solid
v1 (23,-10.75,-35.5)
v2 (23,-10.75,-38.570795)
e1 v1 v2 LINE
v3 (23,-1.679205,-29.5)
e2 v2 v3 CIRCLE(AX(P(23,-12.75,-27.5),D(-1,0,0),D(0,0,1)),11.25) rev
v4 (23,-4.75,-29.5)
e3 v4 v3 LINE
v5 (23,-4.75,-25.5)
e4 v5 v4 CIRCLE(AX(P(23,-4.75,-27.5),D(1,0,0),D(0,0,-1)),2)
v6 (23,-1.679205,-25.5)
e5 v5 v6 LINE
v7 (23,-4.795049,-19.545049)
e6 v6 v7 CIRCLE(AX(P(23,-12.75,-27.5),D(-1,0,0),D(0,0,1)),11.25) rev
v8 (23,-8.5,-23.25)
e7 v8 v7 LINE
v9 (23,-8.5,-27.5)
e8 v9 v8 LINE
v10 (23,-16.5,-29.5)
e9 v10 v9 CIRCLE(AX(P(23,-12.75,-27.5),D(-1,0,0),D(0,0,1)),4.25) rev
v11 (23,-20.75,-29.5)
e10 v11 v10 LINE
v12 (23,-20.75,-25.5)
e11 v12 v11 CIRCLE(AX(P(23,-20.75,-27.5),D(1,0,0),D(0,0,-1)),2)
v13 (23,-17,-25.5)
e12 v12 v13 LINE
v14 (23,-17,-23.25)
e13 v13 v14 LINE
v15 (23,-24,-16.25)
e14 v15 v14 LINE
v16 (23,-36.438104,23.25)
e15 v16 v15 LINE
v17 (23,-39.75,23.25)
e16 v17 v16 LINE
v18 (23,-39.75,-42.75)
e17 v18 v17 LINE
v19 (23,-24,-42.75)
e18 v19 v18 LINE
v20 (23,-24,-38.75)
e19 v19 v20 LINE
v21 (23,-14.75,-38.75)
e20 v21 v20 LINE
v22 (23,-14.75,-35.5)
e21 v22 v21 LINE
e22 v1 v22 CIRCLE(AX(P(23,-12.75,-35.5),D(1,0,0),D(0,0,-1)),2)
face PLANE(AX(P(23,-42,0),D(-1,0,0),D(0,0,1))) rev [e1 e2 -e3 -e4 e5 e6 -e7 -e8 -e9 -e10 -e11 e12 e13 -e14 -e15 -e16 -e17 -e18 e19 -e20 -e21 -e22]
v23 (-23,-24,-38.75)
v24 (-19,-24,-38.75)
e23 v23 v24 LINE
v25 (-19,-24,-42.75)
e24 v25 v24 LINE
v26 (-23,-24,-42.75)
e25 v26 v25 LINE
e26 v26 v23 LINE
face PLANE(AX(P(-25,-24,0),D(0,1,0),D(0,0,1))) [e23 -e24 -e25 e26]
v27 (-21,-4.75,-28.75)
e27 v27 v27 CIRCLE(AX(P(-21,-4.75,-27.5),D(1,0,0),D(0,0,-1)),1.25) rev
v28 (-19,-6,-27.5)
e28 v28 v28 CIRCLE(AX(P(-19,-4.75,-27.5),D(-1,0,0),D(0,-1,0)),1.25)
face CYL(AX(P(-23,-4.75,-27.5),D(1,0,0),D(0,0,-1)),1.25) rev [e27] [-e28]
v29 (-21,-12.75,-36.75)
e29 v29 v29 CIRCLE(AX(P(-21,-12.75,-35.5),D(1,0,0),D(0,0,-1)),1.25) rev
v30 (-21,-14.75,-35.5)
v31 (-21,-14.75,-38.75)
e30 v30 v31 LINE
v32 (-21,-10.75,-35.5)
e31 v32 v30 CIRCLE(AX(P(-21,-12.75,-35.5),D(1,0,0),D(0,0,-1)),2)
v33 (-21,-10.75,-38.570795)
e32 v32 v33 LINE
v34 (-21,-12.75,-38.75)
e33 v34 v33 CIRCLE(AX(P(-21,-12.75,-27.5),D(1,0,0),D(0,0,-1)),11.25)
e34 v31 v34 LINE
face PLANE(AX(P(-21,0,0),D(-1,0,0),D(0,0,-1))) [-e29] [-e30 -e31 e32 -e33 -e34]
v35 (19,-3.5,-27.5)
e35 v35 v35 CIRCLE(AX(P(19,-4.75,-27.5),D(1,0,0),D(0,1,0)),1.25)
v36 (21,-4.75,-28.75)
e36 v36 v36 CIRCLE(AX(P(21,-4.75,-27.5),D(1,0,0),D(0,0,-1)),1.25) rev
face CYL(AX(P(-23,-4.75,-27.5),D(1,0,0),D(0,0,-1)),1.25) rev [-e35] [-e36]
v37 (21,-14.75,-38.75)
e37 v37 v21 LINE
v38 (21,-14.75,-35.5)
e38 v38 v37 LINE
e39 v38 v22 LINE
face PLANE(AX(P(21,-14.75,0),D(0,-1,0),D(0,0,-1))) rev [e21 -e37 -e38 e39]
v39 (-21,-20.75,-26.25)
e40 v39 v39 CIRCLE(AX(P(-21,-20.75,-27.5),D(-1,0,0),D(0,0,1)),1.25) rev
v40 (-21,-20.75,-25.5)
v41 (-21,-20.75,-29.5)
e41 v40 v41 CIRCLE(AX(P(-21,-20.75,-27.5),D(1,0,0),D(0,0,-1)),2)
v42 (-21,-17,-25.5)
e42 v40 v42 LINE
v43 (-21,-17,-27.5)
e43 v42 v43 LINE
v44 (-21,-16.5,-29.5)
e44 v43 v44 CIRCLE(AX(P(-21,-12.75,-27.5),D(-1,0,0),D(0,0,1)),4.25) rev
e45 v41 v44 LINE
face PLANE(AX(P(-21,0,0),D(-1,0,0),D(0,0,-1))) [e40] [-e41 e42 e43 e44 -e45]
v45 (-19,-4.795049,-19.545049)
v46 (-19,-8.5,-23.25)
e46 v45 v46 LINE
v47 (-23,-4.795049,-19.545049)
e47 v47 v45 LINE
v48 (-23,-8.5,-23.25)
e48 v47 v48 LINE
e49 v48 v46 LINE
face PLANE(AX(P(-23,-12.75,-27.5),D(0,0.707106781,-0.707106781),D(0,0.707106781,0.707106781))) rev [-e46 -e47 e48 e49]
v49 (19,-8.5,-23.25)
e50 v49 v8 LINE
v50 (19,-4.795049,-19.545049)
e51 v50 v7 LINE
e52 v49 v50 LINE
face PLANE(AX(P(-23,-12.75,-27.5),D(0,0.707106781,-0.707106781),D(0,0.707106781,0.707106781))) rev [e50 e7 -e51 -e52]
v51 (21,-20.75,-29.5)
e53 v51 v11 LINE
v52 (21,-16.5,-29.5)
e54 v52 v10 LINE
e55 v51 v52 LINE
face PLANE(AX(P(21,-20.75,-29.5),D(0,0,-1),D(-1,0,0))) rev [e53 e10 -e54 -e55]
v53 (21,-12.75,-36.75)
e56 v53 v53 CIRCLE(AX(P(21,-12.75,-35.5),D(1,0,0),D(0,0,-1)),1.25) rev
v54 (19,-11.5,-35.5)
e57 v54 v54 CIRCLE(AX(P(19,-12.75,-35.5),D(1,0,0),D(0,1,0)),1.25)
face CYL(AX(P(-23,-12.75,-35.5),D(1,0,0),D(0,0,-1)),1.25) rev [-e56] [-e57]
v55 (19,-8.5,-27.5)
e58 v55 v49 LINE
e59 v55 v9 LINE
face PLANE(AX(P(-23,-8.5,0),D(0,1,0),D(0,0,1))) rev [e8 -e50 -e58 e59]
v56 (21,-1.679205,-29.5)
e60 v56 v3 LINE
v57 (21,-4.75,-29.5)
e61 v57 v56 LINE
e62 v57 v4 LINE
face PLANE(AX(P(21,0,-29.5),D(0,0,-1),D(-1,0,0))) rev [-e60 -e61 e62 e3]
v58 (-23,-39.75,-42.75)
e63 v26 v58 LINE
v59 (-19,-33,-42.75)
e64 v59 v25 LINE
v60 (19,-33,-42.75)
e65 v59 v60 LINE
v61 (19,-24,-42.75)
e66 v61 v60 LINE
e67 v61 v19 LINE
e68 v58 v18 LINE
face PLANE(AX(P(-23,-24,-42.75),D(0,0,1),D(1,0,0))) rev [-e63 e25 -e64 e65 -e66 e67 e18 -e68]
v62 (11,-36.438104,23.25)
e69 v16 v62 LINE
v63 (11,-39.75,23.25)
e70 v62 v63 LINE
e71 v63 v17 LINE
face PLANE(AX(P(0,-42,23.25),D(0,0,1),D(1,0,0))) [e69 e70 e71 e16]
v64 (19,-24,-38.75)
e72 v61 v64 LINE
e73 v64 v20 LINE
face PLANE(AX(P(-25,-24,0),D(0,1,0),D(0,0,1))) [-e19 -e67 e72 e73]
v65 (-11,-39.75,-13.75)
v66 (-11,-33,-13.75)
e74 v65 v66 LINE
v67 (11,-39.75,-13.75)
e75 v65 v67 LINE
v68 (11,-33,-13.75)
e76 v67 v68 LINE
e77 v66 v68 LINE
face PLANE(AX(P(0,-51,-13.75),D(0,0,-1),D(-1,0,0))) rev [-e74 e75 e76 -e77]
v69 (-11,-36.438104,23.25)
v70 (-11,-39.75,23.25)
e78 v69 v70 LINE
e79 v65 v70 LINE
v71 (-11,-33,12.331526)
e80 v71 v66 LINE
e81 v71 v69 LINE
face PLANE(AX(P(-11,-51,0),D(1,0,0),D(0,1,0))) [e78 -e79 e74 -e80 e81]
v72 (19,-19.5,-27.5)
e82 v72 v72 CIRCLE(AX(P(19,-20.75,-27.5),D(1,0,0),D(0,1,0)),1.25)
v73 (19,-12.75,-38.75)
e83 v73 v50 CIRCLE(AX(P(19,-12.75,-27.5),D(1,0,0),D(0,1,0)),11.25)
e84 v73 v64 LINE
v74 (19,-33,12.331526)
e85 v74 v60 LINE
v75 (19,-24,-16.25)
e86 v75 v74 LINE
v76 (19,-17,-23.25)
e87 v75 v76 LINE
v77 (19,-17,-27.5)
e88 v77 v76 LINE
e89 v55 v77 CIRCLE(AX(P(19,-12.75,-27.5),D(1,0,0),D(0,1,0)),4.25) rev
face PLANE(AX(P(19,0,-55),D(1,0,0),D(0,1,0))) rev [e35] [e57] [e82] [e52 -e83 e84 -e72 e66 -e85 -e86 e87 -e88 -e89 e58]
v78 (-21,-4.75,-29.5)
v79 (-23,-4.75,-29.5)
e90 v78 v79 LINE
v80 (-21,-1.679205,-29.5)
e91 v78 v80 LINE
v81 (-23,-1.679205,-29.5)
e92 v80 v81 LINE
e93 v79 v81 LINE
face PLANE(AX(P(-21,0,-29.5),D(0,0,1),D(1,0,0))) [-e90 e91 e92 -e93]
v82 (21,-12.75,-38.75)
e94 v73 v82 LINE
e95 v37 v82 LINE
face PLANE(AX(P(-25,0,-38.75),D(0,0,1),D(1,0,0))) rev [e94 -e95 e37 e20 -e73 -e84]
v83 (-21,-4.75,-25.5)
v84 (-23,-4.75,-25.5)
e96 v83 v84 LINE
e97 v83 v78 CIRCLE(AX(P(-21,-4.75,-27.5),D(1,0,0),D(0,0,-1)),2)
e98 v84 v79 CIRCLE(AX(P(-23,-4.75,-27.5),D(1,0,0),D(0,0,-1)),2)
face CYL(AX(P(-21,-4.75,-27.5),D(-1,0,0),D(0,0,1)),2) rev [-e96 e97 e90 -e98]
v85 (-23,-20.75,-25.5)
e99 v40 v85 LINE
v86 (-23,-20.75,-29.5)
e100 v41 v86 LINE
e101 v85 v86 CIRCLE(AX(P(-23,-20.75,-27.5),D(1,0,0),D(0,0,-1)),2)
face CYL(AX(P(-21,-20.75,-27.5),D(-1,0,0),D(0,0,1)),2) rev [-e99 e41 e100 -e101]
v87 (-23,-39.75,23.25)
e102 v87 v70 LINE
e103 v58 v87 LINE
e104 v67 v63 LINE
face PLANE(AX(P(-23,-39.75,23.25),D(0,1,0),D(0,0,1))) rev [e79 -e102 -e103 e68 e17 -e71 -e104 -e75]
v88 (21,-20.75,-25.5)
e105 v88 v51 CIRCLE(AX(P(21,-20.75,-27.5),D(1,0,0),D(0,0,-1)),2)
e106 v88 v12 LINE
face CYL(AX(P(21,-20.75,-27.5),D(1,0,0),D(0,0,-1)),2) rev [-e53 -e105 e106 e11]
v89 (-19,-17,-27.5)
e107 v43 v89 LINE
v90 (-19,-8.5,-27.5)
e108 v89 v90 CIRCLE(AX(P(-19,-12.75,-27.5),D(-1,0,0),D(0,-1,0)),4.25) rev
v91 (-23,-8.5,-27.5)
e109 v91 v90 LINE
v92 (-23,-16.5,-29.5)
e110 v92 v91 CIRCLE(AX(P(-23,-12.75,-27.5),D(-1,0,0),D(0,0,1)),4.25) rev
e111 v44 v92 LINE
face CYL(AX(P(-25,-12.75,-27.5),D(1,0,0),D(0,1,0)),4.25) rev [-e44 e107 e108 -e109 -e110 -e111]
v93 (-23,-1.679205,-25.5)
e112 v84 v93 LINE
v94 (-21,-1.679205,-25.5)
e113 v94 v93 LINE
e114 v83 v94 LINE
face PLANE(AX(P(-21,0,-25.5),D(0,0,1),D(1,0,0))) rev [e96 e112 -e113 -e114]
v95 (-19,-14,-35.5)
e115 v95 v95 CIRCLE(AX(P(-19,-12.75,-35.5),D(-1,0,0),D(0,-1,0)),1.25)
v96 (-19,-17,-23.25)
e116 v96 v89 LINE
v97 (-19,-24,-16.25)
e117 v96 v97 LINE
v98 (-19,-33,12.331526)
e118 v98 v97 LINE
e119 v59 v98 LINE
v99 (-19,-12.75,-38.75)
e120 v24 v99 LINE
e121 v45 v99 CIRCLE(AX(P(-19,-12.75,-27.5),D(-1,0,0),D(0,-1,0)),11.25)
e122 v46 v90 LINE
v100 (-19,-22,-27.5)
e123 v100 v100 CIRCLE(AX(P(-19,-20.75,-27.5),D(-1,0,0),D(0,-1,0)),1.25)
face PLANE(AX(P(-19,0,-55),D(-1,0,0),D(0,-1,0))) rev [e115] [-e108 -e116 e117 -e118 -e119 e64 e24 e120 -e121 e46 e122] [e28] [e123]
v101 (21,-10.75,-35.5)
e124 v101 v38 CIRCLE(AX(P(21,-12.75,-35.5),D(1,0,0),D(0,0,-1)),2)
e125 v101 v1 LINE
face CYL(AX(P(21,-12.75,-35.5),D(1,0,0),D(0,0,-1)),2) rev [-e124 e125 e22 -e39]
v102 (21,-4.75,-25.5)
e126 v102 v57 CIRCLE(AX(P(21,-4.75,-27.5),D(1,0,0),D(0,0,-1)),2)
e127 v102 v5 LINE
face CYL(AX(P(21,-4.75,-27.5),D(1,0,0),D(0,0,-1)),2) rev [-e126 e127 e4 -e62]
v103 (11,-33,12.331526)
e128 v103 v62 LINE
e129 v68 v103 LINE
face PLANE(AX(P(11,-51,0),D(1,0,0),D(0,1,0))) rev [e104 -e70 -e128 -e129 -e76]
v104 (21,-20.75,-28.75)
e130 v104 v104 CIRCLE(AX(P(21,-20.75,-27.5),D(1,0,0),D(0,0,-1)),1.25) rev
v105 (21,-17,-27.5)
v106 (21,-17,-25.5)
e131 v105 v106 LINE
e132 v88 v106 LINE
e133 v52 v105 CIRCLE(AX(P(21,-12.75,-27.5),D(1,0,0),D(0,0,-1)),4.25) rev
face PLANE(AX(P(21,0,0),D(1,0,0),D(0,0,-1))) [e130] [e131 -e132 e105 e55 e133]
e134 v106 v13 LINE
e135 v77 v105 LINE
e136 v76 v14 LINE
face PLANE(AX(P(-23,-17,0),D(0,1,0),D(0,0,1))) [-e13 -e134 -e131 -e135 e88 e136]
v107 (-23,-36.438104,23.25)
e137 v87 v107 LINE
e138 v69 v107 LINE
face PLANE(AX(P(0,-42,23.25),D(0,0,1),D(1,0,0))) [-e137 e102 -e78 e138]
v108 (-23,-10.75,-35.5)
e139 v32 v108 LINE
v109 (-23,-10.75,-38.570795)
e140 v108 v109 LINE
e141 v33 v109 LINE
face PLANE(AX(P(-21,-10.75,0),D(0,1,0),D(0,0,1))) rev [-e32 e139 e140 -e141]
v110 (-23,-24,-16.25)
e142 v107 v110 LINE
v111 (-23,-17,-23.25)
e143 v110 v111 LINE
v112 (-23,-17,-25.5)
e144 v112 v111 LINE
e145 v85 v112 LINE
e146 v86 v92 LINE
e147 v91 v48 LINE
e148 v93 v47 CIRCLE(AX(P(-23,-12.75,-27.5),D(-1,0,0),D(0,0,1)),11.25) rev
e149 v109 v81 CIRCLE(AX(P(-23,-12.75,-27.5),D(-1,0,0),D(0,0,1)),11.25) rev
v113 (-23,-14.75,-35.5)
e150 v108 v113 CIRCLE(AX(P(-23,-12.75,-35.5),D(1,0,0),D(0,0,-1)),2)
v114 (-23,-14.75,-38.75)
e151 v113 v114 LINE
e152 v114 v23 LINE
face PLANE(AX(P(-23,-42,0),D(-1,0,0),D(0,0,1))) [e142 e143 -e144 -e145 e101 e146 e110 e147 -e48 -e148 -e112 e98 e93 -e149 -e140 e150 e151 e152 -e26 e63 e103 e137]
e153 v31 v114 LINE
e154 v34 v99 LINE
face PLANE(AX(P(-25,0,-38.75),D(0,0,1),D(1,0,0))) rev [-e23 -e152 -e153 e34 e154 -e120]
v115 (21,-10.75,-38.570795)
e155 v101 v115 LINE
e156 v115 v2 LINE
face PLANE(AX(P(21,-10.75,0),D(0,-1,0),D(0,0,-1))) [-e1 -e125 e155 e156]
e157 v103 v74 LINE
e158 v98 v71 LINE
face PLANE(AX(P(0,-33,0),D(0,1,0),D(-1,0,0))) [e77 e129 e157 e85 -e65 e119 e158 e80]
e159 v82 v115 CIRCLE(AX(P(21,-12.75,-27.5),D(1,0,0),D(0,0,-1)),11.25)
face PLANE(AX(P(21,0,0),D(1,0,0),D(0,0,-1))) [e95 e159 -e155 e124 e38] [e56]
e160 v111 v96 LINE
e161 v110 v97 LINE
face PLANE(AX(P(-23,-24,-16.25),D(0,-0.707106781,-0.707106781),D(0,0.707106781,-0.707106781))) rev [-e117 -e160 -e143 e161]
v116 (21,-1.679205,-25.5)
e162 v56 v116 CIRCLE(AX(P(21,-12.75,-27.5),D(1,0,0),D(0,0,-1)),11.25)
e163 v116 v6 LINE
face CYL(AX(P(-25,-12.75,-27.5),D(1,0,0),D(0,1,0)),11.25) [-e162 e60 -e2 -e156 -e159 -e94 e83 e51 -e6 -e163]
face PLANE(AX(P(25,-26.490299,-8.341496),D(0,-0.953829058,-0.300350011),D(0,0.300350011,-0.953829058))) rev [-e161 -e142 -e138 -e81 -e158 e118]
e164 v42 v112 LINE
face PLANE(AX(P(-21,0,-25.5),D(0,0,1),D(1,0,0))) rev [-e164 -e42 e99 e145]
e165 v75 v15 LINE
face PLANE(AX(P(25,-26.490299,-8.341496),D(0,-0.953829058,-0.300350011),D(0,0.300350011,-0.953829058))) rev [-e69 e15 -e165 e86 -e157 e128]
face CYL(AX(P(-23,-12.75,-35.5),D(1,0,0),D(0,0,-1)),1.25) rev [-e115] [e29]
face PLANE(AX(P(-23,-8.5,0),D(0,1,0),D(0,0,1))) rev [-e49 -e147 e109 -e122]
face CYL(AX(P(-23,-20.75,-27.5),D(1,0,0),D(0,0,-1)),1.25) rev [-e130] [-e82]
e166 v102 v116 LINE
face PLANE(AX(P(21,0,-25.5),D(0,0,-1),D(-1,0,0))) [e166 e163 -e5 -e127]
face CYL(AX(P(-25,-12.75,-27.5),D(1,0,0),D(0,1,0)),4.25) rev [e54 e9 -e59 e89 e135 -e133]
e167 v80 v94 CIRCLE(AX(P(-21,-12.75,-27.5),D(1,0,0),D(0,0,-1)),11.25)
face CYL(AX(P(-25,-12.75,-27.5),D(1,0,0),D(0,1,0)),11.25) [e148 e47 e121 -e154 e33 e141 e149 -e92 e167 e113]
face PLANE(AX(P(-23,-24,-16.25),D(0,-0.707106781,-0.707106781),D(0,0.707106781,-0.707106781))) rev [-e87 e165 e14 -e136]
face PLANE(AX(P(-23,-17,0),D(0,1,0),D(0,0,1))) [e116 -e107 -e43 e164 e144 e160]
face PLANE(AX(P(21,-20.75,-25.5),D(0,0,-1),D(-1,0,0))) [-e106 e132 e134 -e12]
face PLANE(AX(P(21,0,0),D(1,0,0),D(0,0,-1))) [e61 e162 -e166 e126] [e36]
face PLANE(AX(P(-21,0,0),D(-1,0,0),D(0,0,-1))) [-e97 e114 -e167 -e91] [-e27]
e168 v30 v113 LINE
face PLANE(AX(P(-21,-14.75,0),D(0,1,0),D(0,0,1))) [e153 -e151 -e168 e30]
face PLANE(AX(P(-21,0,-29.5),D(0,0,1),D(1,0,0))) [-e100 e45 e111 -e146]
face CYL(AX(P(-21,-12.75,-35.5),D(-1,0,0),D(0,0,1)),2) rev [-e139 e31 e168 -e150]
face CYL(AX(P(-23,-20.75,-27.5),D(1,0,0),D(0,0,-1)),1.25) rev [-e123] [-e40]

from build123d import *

# Parameters (mm, degrees)
SKETCH1_W                = 50
SKETCH1_H                = 170
BOSS_EXTRUDE1_DEPTH      = 55
SKETCH2_W                = 34
SKETCH2_H                = 27
CUT_EXTRUDE1_DEPTH       = 181.416185527
SKETCH3_W                = 10
SKETCH3_H                = 24
SKETCH3_R                = 4.25
SKETCH3_R_2              = 1
CUT_EXTRUDE2_DEPTH       = 186.539753153
SKETCH4_W                = 2
SKETCH4_H                = 24
CUT_EXTRUDE3_DEPTH       = 178.623196683
SKETCH5_W                = 6.25
SKETCH5_H                = 11.25
CUT_EXTRUDE4_DEPTH       = 186.539753153
SKETCH6_W                = 38
SKETCH6_H                = 10
CUT_EXTRUDE5_DEPTH       = 181.416185527
SKETCH8_W                = 13.25
SKETCH8_H                = 2.25
CUT_EXTRUDE7_DEPTH       = 186.539753153
SKETCH9_W                = 34
SKETCH9_H                = 35.25
CUT_EXTRUDE8_DEPTH       = 179.297679458
SKETCH11_W               = 13.25
SKETCH11_H               = 20.25
CUT_EXTRUDE9_DEPTH       = 184.480414486
SKETCH12_W               = 28.5
SKETCH12_H               = 15
BOSS_EXTRUDE2_DEPTH      = 8
SKETCH14_W               = 34
SKETCH14_H               = 15
SKETCH14_H_2             = 10.25
BOSS_EXTRUDE3_DEPTH      = 13.25
SKETCH16_R               = 4.5
SKETCH16_R_2             = 2.5
CUT_EXTRUDE13_DEPTH      = 8
SKETCH17_R               = 4.5
SKETCH17_W               = 55
SKETCH17_H               = 10.25
CUT_EXTRUDE15_DEPTH      = 175.384811552
SKETCH18_W               = 71.25
SKETCH18_H               = 27.5
SKETCH18_W_2             = 13.75
SKETCH18_W_3             = 16.25
BOSS_EXTRUDE4_DEPTH      = 50
SKETCH19_W               = 38
SKETCH19_H               = 7
CUT_EXTRUDE16_DEPTH      = 152.25227271
SKETCH20_W               = 57.5
SKETCH20_H               = 27.5
CUT_EXTRUDE17_DEPTH      = 102.137591923
CUT_EXTRUDE18_DEPTH      = 100.39221549
SKETCH22_W               = 82.5
SKETCH22_H               = 2.5
BOSS_EXTRUDE5_DEPTH      = 50
SKETCH24_W               = 22
SKETCH24_H               = 17
CUT_EXTRUDE19_DEPTH      = 101.710289941
SKETCH25_W               = 38
SKETCH25_H               = 38.136363636
CUT_EXTRUDE20_DEPTH      = 10
SKETCH27_W               = 38
SKETCH27_H               = 60.136363636
BOSS_EXTRUDE6_DEPTH      = 8.6
SKETCH29_W               = 38
SKETCH29_H               = 1.4
CUT_EXTRUDE21_DEPTH      = 85.601313414
BOSS_EXTRUDE7_DEPTH      = 50
SKETCH31_W               = 38
SKETCH31_H               = 17
CUT_EXTRUDE22_DEPTH      = 117.365802537
SKETCH32_W               = 100
SKETCH32_H               = 3
CUT_EXTRUDE23_DEPTH      = 101.710289941
SKETCH33_W               = 20
SKETCH33_H               = 10
SKETCH33_W_2             = 22
SKETCH33_H_2             = 45
CUT_EXTRUDE24_DEPTH      = 84.137311118
SKETCH34_W               = 8
SKETCH34_H               = 12
CUT_EXTRUDE25_DEPTH      = 76.0787087
BOSS_EXTRUDE8_DEPTH      = 8
SKETCH37_W               = 78
SKETCH37_H               = 9
SKETCH37_W_2             = 12
CUT_EXTRUDE27_DEPTH      = 93.48006542
FILLET1_R                = 10
CUT_EXTRUDE29_DEPTH      = 77.423572934
CUT_EXTRUDE29_DEPTH_BACK = 77.423572934
SKETCH38_W               = 2
SKETCH38_H               = 78
SKETCH38_W_2             = 46
SKETCH38_H_2             = 8
SKETCH39_W               = 22.223383748
SKETCH39_H               = 19.441332461
CUT_EXTRUDE30_DEPTH      = 86.624543794
BOSS_EXTRUDE9_DEPTH      = 0.75
CUT_EXTRUDE31_DEPTH      = 76.967920861
SKETCH44_R               = 1.25
CUT_EXTRUDE32_DEPTH      = 76.967920861
SKETCH45_R               = 1.25
CUT_EXTRUDE33_DEPTH      = 2
CUT_EXTRUDE34_DEPTH      = 76.967920861
SKETCH48_W               = 66
SKETCH48_H               = 3
CUT_EXTRUDE35_DEPTH      = 76.967920861


with BuildPart() as part:
    # Sketch1 → Boss-Extrude1 (new body)
    with BuildSketch(Plane.XY):
        with Locations((0, -85)):
            Rectangle(SKETCH1_W, SKETCH1_H)
    extrude(amount=-BOSS_EXTRUDE1_DEPTH)

    # Sketch2 → Cut-Extrude1 (cut, through all)
    with BuildSketch(Plane.XY):
        with Locations((0, -13.5)):
            Rectangle(SKETCH2_W, SKETCH2_H)
    extrude(amount=-CUT_EXTRUDE1_DEPTH, mode=Mode.SUBTRACT)

    # Sketch3 → Cut-Extrude2 (cut, through all)
    with BuildSketch(Plane(origin=(25, 0, 0), x_dir=(0, 0, -1), z_dir=(1, 0, 0))):
        with Locations((50, -12)):
            Rectangle(SKETCH3_W, SKETCH3_H)
        with Locations((5, -12)):
            Rectangle(SKETCH3_W, SKETCH3_H)
        with Locations(Location((27.5, -12.75, 0), (0, 0, 90))):
            Circle(SKETCH3_R)
        with Locations(Location((35.5, -12.75, 0), (0, 0, 90))):
            Circle(SKETCH3_R_2)
        with Locations(Location((27.5, -4.75, 0), (0, 0, 90))):
            Circle(SKETCH3_R_2)
        with Locations(Location((27.5, -20.75, 0), (0, 0, 90))):
            Circle(SKETCH3_R_2)
        with Locations(Location((19.5, -12.75, 0), (0, 0, 90))):
            Circle(SKETCH3_R_2)
    extrude(amount=-CUT_EXTRUDE2_DEPTH, mode=Mode.SUBTRACT)

    # Sketch4 → Cut-Extrude3 (cut, through all)
    with BuildSketch(Plane.XY.offset(-10)):
        with Locations((-18, -12)):
            Rectangle(SKETCH4_W, SKETCH4_H)
        with Locations((18, -12)):
            Rectangle(SKETCH4_W, SKETCH4_H)
    extrude(amount=-CUT_EXTRUDE3_DEPTH, mode=Mode.SUBTRACT)

    # Sketch5 → Cut-Extrude4 (cut, through all)
    with BuildSketch(Plane(origin=(25, 0, 0), x_dir=(0, 0, -1), z_dir=(1, 0, 0))):
        with BuildLine():
            Line((45, 0), (10, 0))
            Line((10, 0), (10, -12.75))
            Line((10, -12.75), (16.25, -12.75))
            ThreePointArc((16.25, -12.75), (27.5, -1.5), (38.75, -12.75))
            Line((38.75, -12.75), (45, -12.75))
            Line((45, -12.75), (45, 0))
        make_face()
        with Locations((13.125, -18.375)):
            Rectangle(SKETCH5_W, SKETCH5_H)
        with Locations((41.875, -18.375)):
            Rectangle(SKETCH5_W, SKETCH5_H)
    extrude(amount=-CUT_EXTRUDE4_DEPTH, mode=Mode.SUBTRACT)

    # Sketch6 → Cut-Extrude5 (cut, through all)
    with BuildSketch(Plane.XY):
        with Locations((0, -29)):
            Rectangle(SKETCH6_W, SKETCH6_H)
    extrude(amount=-CUT_EXTRUDE5_DEPTH, mode=Mode.SUBTRACT)

    # Sketch8 → Cut-Extrude7 (cut, through all)
    with BuildSketch(Plane(origin=(25, 0, 0), x_dir=(0, 0, -1), z_dir=(1, 0, 0))):
        with BuildLine():
            Line((27.5, -157.5), (27.5, -132.5))
            Line((27.5, -132.5), (13.25, -132.5))
            Line((13.25, -132.5), (13.25, -167.75))
            Line((13.25, -167.75), (17.25, -167.75))
            ThreePointArc((17.25, -167.75), (20.252155493, -160.502155493), (27.5, -157.5))
        make_face()
        with BuildLine():
            Line((41.75, -167.75), (41.75, -132.5))
            Line((41.75, -132.5), (27.5, -132.5))
            Line((27.5, -132.5), (27.5, -157.5))
            ThreePointArc((27.5, -157.5), (34.747844507, -160.502155493), (37.75, -167.75))
            Line((37.75, -167.75), (41.75, -167.75))
        make_face()
        with Locations((48.375, -168.875)):
            Rectangle(SKETCH8_W, SKETCH8_H)
        with Locations((6.625, -168.875)):
            Rectangle(SKETCH8_W, SKETCH8_H)
        with BuildLine():
            Line((17.25, -167.75), (13.25, -167.75))
            Line((13.25, -167.75), (13.25, -170))
            Line((13.25, -170), (17.5, -170))
            ThreePointArc((17.5, -170), (17.31269172, -168.881923142), (17.25, -167.75))
        make_face()
        with BuildLine():
            Line((41.75, -170), (41.75, -167.75))
            Line((41.75, -167.75), (37.75, -167.75))
            ThreePointArc((37.75, -167.75), (37.68730828, -168.881923142), (37.5, -170))
            Line((37.5, -170), (41.75, -170))
        make_face()
        with BuildLine():
            Line((27.5, -167.75), (27.5, -157.5))
            ThreePointArc((27.5, -157.5), (20.252155493, -160.502155493), (17.25, -167.75))
            Line((17.25, -167.75), (27.5, -167.75))
        make_face()
        with BuildLine():
            ThreePointArc((37.75, -167.75), (34.747844507, -160.502155493), (27.5, -157.5))
            Line((27.5, -157.5), (27.5, -167.75))
            Line((27.5, -167.75), (37.75, -167.75))
        make_face()
        with BuildLine():
            Line((27.5, -170), (27.5, -167.75))
            Line((27.5, -167.75), (17.25, -167.75))
            ThreePointArc((17.25, -167.75), (17.31269172, -168.881923142), (17.5, -170))
            Line((17.5, -170), (27.5, -170))
        make_face()
        with BuildLine():
            ThreePointArc((37.5, -170), (37.68730828, -168.881923142), (37.75, -167.75))
            Line((37.75, -167.75), (27.5, -167.75))
            Line((27.5, -167.75), (27.5, -170))
            Line((27.5, -170), (37.5, -170))
        make_face()
    extrude(amount=-CUT_EXTRUDE7_DEPTH, mode=Mode.SUBTRACT)

    # Sketch9 → Cut-Extrude8 (cut, through all)
    with BuildSketch(Plane.XY):
        with Locations((0, -150.125)):
            Rectangle(SKETCH9_W, SKETCH9_H)
    extrude(amount=-CUT_EXTRUDE8_DEPTH, mode=Mode.SUBTRACT)

    # Sketch11 → Cut-Extrude9 (cut, through all)
    with BuildSketch(Plane(origin=(25, 0, 0), x_dir=(0, 0, -1), z_dir=(1, 0, 0))):
        with BuildLine():
            ThreePointArc((17.25, -167.75), (20.252155493, -160.502155493), (27.5, -157.5))
            Line((27.5, -157.5), (27.5, -147.5))
            Line((27.5, -147.5), (13.25, -147.5))
            Line((13.25, -147.5), (13.25, -167.75))
            Line((13.25, -167.75), (17.25, -167.75))
        make_face()
        with BuildLine():
            Line((27.5, -147.5), (27.5, -157.5))
            ThreePointArc((27.5, -157.5), (34.747844507, -160.502155493), (37.75, -167.75))
            Line((37.75, -167.75), (41.75, -167.75))
            Line((41.75, -167.75), (41.75, -147.5))
            Line((41.75, -147.5), (27.5, -147.5))
        make_face()
        with Locations((48.375, -157.625)):
            Rectangle(SKETCH11_W, SKETCH11_H)
        with Locations((6.625, -157.625)):
            Rectangle(SKETCH11_W, SKETCH11_H)
    extrude(amount=-CUT_EXTRUDE9_DEPTH, mode=Mode.SUBTRACT)

    # Sketch12 → Boss-Extrude2 (add)
    with BuildSketch(Plane(origin=(25, 0, 0), x_dir=(0, 0, -1), z_dir=(1, 0, 0))):
        with Locations((27.5, -140)):
            Rectangle(SKETCH12_W, SKETCH12_H)
    boss_extrude2 = extrude(amount=-BOSS_EXTRUDE2_DEPTH)

    # Mirror1: Boss-Extrude2 across plane
    add(boss_extrude2.mirror(Plane(origin=(0, 0, 0), x_dir=(0, 0, 1), z_dir=(1, 0, 0))))

    # Sketch14 → Boss-Extrude3 (add)
    with BuildSketch(Plane.XY):
        with Locations((0, -140)):
            Rectangle(SKETCH14_W, SKETCH14_H)
        with Locations((0, -152.625)):
            Rectangle(SKETCH14_W, SKETCH14_H_2)
    boss_extrude3 = extrude(amount=-BOSS_EXTRUDE3_DEPTH)

    # Mirror2: Boss-Extrude3 across plane
    add(boss_extrude3.mirror(Plane.XY.offset(-27.5)))

    # Sketch16 → Cut-Extrude13 (cut)
    # profile 1 of 3: a face of its own
    with BuildSketch(Plane(origin=(25, 0, 0), x_dir=(0, 0, -1), z_dir=(1, 0, 0))):
        with Locations(Location((16.5, -135.75, 0), (0, 0, 90))):
            Circle(SKETCH16_R)
        with Locations((16.5, -135.75)):
            Circle(SKETCH16_R_2, mode=Mode.SUBTRACT)
    # profile 2 of 3: a face of its own
    with BuildSketch(Plane(origin=(25, 0, 0), x_dir=(0, 0, -1), z_dir=(1, 0, 0))):
        with Locations((16.5, -135.75)):
            Circle(SKETCH16_R_2)
    # profile 3 of 3: a face of its own
    with BuildSketch(Plane(origin=(25, 0, 0), x_dir=(0, 0, -1), z_dir=(1, 0, 0))):
        with Locations(Location((38.5, -135.75, 0), (0, 0, 90))):
            Circle(SKETCH16_R)
    cut_extrude13 = extrude(amount=-CUT_EXTRUDE13_DEPTH, mode=Mode.SUBTRACT)

    # Mirror3: Cut-Extrude13 across plane
    add(cut_extrude13.mirror(Plane(origin=(0, 0, 0), x_dir=(0, 0, 1), z_dir=(1, 0, 0))), mode=Mode.SUBTRACT)

    # Sketch17 → Cut-Extrude15 (cut, through all)
    # profile 1 of 4: a face of its own
    with BuildSketch(Plane(origin=(25, 0, 0), x_dir=(0, 0, -1), z_dir=(1, 0, 0))):
        Polygon((55, -51.5), (27.5, -51.5), (0, -51.5), (0, -147.5), (55, -147.5), align=None)
        with Locations((16.5, -135.75)):
            Circle(SKETCH17_R, mode=Mode.SUBTRACT)
        with Locations((38.5, -135.75)):
            Circle(SKETCH17_R, mode=Mode.SUBTRACT)
    # profile 2 of 4: a face of its own
    with BuildSketch(Plane(origin=(25, 0, 0), x_dir=(0, 0, -1), z_dir=(1, 0, 0))):
        with Locations((27.5, -152.625)):
            Rectangle(SKETCH17_W, SKETCH17_H)
    # profile 3 of 4: a face of its own
    with BuildSketch(Plane(origin=(25, 0, 0), x_dir=(0, 0, -1), z_dir=(1, 0, 0))):
        with Locations((38.5, -135.75)):
            Circle(SKETCH17_R)
    # profile 4 of 4: a face of its own
    with BuildSketch(Plane(origin=(25, 0, 0), x_dir=(0, 0, -1), z_dir=(1, 0, 0))):
        with Locations((16.5, -135.75)):
            Circle(SKETCH17_R)
    extrude(amount=-CUT_EXTRUDE15_DEPTH, mode=Mode.SUBTRACT)

    # Sketch18 → Boss-Extrude4 (add)
    with BuildSketch(Plane(origin=(25, 0, 0), x_dir=(0, 0, -1), z_dir=(1, 0, 0))):
        with Locations((-35.625, -37.75)):
            Rectangle(SKETCH18_W, SKETCH18_H)
        with Locations((61.875, -37.75)):
            Rectangle(SKETCH18_W_2, SKETCH18_H)
        Polygon((38.75, -51.5), (38.75, -24), (16.25, -24), (0, -24), (0, -51.5), align=None)
        with Locations((46.875, -37.75)):
            Rectangle(SKETCH18_W_3, SKETCH18_H)
    extrude(amount=-BOSS_EXTRUDE4_DEPTH)

    # Sketch19 → Cut-Extrude16 (cut, through all)
    with BuildSketch(Plane.XY.offset(71.25)):
        with Locations((0, -27.5)):
            Rectangle(SKETCH19_W, SKETCH19_H)
    extrude(amount=-CUT_EXTRUDE16_DEPTH, mode=Mode.SUBTRACT)

    # Sketch20 → Cut-Extrude17 (cut, through all)
    with BuildSketch(Plane(origin=(25, 0, 0), x_dir=(0, 0, -1), z_dir=(1, 0, 0))):
        with Locations((-42.5, -37.75)):
            Rectangle(SKETCH20_W, SKETCH20_H)
    extrude(amount=-CUT_EXTRUDE17_DEPTH, mode=Mode.SUBTRACT)

    # Sketch21 → Cut-Extrude18 (cut, through all)
    with BuildSketch(Plane(origin=(25, 0, 0), x_dir=(0, 0, -1), z_dir=(1, 0, 0))):
        Polygon((16.25, -24), (-13.75, -51.5), (-13.75, -24), align=None)
    extrude(amount=-CUT_EXTRUDE18_DEPTH, mode=Mode.SUBTRACT)

    # Sketch22 → Boss-Extrude5 (add)
    with BuildSketch(Plane(origin=(25, 0, 0), x_dir=(0, 0, -1), z_dir=(1, 0, 0))):
        with Locations((27.5, -52.75)):
            Rectangle(SKETCH22_W, SKETCH22_H)
    extrude(amount=-BOSS_EXTRUDE5_DEPTH)

    # Sketch24 → Cut-Extrude19 (cut, through all)
    with BuildSketch(Plane(origin=(25, 0, 0), x_dir=(0, 0, -1), z_dir=(1, 0, 0))):
        with Locations((57.75, -32.5)):
            Rectangle(SKETCH24_W, SKETCH24_H)
    extrude(amount=-CUT_EXTRUDE19_DEPTH, mode=Mode.SUBTRACT)

    # Sketch25 → Cut-Extrude20 (cut)
    with BuildSketch(Plane(origin=(0, -31, 0), x_dir=(1, 0, 0), z_dir=(0, 1, 0))):
        with Locations((0, 27.681818182)):
            Rectangle(SKETCH25_W, SKETCH25_H)
    extrude(amount=-CUT_EXTRUDE20_DEPTH, mode=Mode.SUBTRACT)

    # Sketch27 → Boss-Extrude6 (add)
    with BuildSketch(Plane(origin=(0, -41, 0), x_dir=(1, 0, 0), z_dir=(0, 1, 0))):
        with Locations((0, 38.681818182)):
            Rectangle(SKETCH27_W, SKETCH27_H)
    extrude(amount=BOSS_EXTRUDE6_DEPTH)

    # Sketch29 → Cut-Extrude21 (cut, through all)
    with BuildSketch(Plane(origin=(0, 0, -8.613636364), x_dir=(-1, 0, 0), z_dir=(0, 0, -1))):
        with Locations((0, -31.7)):
            Rectangle(SKETCH29_W, SKETCH29_H)
    extrude(amount=-CUT_EXTRUDE21_DEPTH, mode=Mode.SUBTRACT)

    # Sketch30 → Boss-Extrude7 (add)
    with BuildSketch(Plane.ZY.offset(25)):
        Polygon((31.25, -38.957214173), (-16.25, -24), (-7.086363636, -32.4), (13.75, -51.5), (13.75, -53.914428346), (31.25, -53.914428346), align=None)
        Polygon((-16.25, -24), (-16.25, -32.4), (-7.086363636, -32.4), align=None)
    extrude(amount=-BOSS_EXTRUDE7_DEPTH)

    # Sketch31 → Cut-Extrude22 (cut, through all)
    with BuildSketch(Plane(origin=(0, 0, -68.75), x_dir=(-1, 0, 0), z_dir=(0, 0, -1))):
        with Locations((0, -32.5)):
            Rectangle(SKETCH31_W, SKETCH31_H)
    extrude(amount=-CUT_EXTRUDE22_DEPTH, mode=Mode.SUBTRACT)

    # Sketch32 → Cut-Extrude23 (cut, through all)
    with BuildSketch(Plane(origin=(25, 0, 0), x_dir=(0, 0, -1), z_dir=(1, 0, 0))):
        with Locations((18.75, -52.5)):
            Rectangle(SKETCH32_W, SKETCH32_H)
    extrude(amount=-CUT_EXTRUDE23_DEPTH, mode=Mode.SUBTRACT)

    # Sketch33 → Cut-Extrude24 (cut, through all)
    with BuildSketch(Plane(origin=(0, -41, 0), x_dir=(1, 0, 0), z_dir=(0, 1, 0))):
        Polygon((-10, 68.75), (-25, 68.75), (-25, 46.75), (-19, 46.75), (-10, 46.75), (-10, 58.75), align=None)
        Polygon((25, 68.75), (10, 68.75), (10, 58.75), (10, 46.75), (19, 46.75), (25, 46.75), align=None)
        with Locations((0, 63.75)):
            Rectangle(SKETCH33_W, SKETCH33_H)
        with Locations((0, -8.75)):
            Rectangle(SKETCH33_W_2, SKETCH33_H_2)
    extrude(amount=-CUT_EXTRUDE24_DEPTH, mode=Mode.SUBTRACT)

    # Sketch34 → Cut-Extrude25 (cut, through all)
    with BuildSketch(Plane(origin=(0, -41, 0), x_dir=(1, 0, 0), z_dir=(0, 1, 0))):
        with Locations((0, 52.75)):
            Rectangle(SKETCH34_W, SKETCH34_H)
    extrude(amount=-CUT_EXTRUDE25_DEPTH, mode=Mode.SUBTRACT)

    # Sketch36 → Boss-Extrude8 (add)
    with BuildSketch(Plane(origin=(0, -41, 0), x_dir=(1, 0, 0), z_dir=(0, 1, 0))):
        Polygon((4, 58.75), (4, 46.75), (-4, 46.75), (-4, 58.75), (-10, 58.75), (-10, 46.75), (-19, 46.75), (-19, -31.25), (-11, -31.25), (-11, 13.75), (11, 13.75), (11, -31.25), (19, -31.25), (19, 46.75), (10, 46.75), (10, 58.75), align=None)
    extrude(amount=BOSS_EXTRUDE8_DEPTH)

    # Sketch37 → Cut-Extrude27 (cut, through all)
    with BuildSketch(Plane(origin=(25, 0, 0), x_dir=(0, 0, -1), z_dir=(1, 0, 0))):
        with Locations((7.75, -46.5)):
            Rectangle(SKETCH37_W, SKETCH37_H)
        Polygon((-31.25, -33), (-31.25, -38.957214173), (-12.331525614, -33), align=None)
        with Locations((52.75, -46.5)):
            Rectangle(SKETCH37_W_2, SKETCH37_H)
    extrude(amount=-CUT_EXTRUDE27_DEPTH, mode=Mode.SUBTRACT)

    # Fillet1
    # the kernel refuses this fillet: 10 mm, written as the material it takes off along each edge
    with BuildSketch(Plane(origin=(20.874685928, -42, -58.75), x_dir=(0, 0, 1), z_dir=(-1, 0, 0)), Plane(origin=(34.874685928, -42, -58.75), x_dir=(0, 0, 1), z_dir=(-1, 0, 0))) as fillet1_piece_1:
        with BuildLine():
            CenterArc((9.949874371, 10), FILLET1_R, 185.739170477, 84.260829523)
            Line((0, 9), (-0.198997487, 8.98))
            ThreePointArc((-0.198997487, 8.98), (-0.2, 4.5), (-0.2, 0))
            Line((-0.2, 0), (0, -0.2))
            Line((0, -0.2), (9.949874371, -0.2))
            Line((9.949874371, -0.2), (9.949874371, 0))
        make_face()
    extrude(amount=55.749371855, mode=Mode.SUBTRACT)

    # Sketch38 → Cut-Extrude29 (cut, two sides: drawn at the far end of the back side and taken through both)
    with BuildSketch(Plane(origin=(0, 0, 0), x_dir=(1, 0, 0), z_dir=(0, 1, 0)).offset(-CUT_EXTRUDE29_DEPTH_BACK)):
        with Locations((-24, 7.75)):
            Rectangle(SKETCH38_W, SKETCH38_H)
        with Locations((24, 7.75)):
            Rectangle(SKETCH38_W, SKETCH38_H)
        with Locations((0, -27.25)):
            Rectangle(SKETCH38_W_2, SKETCH38_H_2)
    extrude(amount=CUT_EXTRUDE29_DEPTH + CUT_EXTRUDE29_DEPTH_BACK, mode=Mode.SUBTRACT)

    # Sketch39 → Cut-Extrude30 (cut, through all)
    with BuildSketch(Plane(origin=(23, 0, 0), x_dir=(0, 0, -1), z_dir=(1, 0, 0))):
        with Locations((53.861691874, -33.720666231)):
            Rectangle(SKETCH39_W, SKETCH39_H)
    extrude(amount=-CUT_EXTRUDE30_DEPTH, mode=Mode.SUBTRACT)

    # Sketch41 → Boss-Extrude9 (add)
    with BuildSketch(Plane.XZ.offset(42)):
        Polygon((-11, 23.25), (-23, 23.25), (-23, -42.75), (23, -42.75), (23, 23.25), (11, 23.25), (11, -13.75), (-11, -13.75), align=None)
    extrude(amount=BOSS_EXTRUDE9_DEPTH)

    # Sketch42 → Cut-Extrude31 (cut, through all)
    with BuildSketch(Plane(origin=(23, 0, 0), x_dir=(0, 0, -1), z_dir=(1, 0, 0))):
        Polygon((16.25, -24), (27.5, -12.75), (19.545048712, -4.795048712), (8.295048712, -16.045048712), align=None)
    extrude(amount=-CUT_EXTRUDE31_DEPTH, mode=Mode.SUBTRACT)

    # Sketch44 → Cut-Extrude32 (cut, through all)
    with BuildSketch(Plane(origin=(23, 0, 0), x_dir=(0, 0, -1), z_dir=(1, 0, 0))):
        with Locations((27.5, -4.75)):
            Circle(SKETCH44_R)
        with Locations((35.5, -12.75)):
            Circle(SKETCH44_R)
        with Locations((27.5, -20.75)):
            Circle(SKETCH44_R)
    extrude(amount=-CUT_EXTRUDE32_DEPTH, mode=Mode.SUBTRACT)

    # Sketch45 → Cut-Extrude33 (cut)
    # profile 1 of 3: a face of its own
    with BuildSketch(Plane(origin=(23, 0, 0), x_dir=(0, 0, -1), z_dir=(1, 0, 0))):
        with BuildLine():
            Line((25.5, -1.679205087), (25.5, -4.75))
            ThreePointArc((25.5, -4.75), (27.5, -6.75), (29.5, -4.75))
            Line((29.5, -4.75), (29.5, -1.679205087))
            ThreePointArc((29.5, -1.679205087), (27.5, -1.5), (25.5, -1.679205087))
        make_face()
        with Locations((27.5, -4.75)):
            Circle(SKETCH45_R, mode=Mode.SUBTRACT)
    # profile 2 of 3: a face of its own
    with BuildSketch(Plane(origin=(23, 0, 0), x_dir=(0, 0, -1), z_dir=(1, 0, 0))):
        with BuildLine():
            ThreePointArc((38.75, -12.75), (38.705109164, -11.745993717), (38.570794913, -10.75))
            Line((38.570794913, -10.75), (35.5, -10.75))
            ThreePointArc((35.5, -10.75), (33.5, -12.75), (35.5, -14.75))
            Line((35.5, -14.75), (38.75, -14.75))
            Line((38.75, -14.75), (38.75, -12.75))
        make_face()
        with Locations((35.5, -12.75)):
            Circle(SKETCH45_R, mode=Mode.SUBTRACT)
    # profile 3 of 3: a face of its own
    with BuildSketch(Plane(origin=(23, 0, 0), x_dir=(0, 0, -1), z_dir=(1, 0, 0))):
        with BuildLine():
            Line((25.5, -16.5), (25.5, -20.75))
            ThreePointArc((25.5, -20.75), (27.5, -22.75), (29.5, -20.75))
            Line((29.5, -20.75), (29.5, -16.5))
            ThreePointArc((29.5, -16.5), (27.5, -17), (25.5, -16.5))
        make_face()
        with Locations((27.5, -20.75)):
            Circle(SKETCH45_R, mode=Mode.SUBTRACT)
    cut_extrude33 = extrude(amount=-CUT_EXTRUDE33_DEPTH, mode=Mode.SUBTRACT)

    # Mirror4: Cut-Extrude33 across plane
    add(cut_extrude33.mirror(Plane(origin=(0, 0, 0), x_dir=(0, 0, 1), z_dir=(1, 0, 0))), mode=Mode.SUBTRACT)

    # Sketch47 → Cut-Extrude34 (cut, through all)
    with BuildSketch(Plane(origin=(23, 0, 0), x_dir=(0, 0, -1), z_dir=(1, 0, 0))):
        with BuildLine():
            ThreePointArc((25.5, -16.5), (26.469223594, -16.873105626), (27.5, -17))
            Line((27.5, -17), (27.5, -8.5))
            ThreePointArc((27.5, -8.5), (25.873595412, -8.823511987), (24.49479618, -9.74479618))
            ThreePointArc((24.49479618, -9.74479618), (23.25, -12.75), (24.49479618, -15.75520382))
            ThreePointArc((24.49479618, -15.75520382), (24.969842563, -16.164791845), (25.5, -16.5))
        make_face()
        with BuildLine():
            Line((27.5, -8.5), (27.5, -17))
            ThreePointArc((27.5, -17), (28.530776406, -16.873105626), (29.5, -16.5))
            ThreePointArc((29.5, -16.5), (31.144344934, -14.936606961), (31.75, -12.75))
            ThreePointArc((31.75, -12.75), (30.50520382, -9.74479618), (27.5, -8.5))
        make_face()
        with BuildLine():
            Line((17.870481142, -17), (23.25, -17))
            Line((23.25, -17), (24.49479618, -15.75520382))
            ThreePointArc((24.49479618, -15.75520382), (23.25, -12.75), (24.49479618, -9.74479618))
            Line((24.49479618, -9.74479618), (23.25, -8.5))
            Line((23.25, -8.5), (17.870481142, -8.5))
            Line((17.870481142, -8.5), (17.870481142, -17))
        make_face()
        with BuildLine():
            ThreePointArc((24.49479618, -9.74479618), (25.873595412, -8.823511987), (27.5, -8.5))
            Line((27.5, -8.5), (23.25, -8.5))
            Line((23.25, -8.5), (24.49479618, -9.74479618))
        make_face()
        with BuildLine():
            Line((23.25, -17), (25.5, -17))
            Line((25.5, -17), (25.5, -16.5))
            ThreePointArc((25.5, -16.5), (24.969842563, -16.164791845), (24.49479618, -15.75520382))
            Line((24.49479618, -15.75520382), (23.25, -17))
        make_face()
        with BuildLine():
            Line((25.5, -17), (27.5, -17))
            ThreePointArc((27.5, -17), (26.469223594, -16.873105626), (25.5, -16.5))
            Line((25.5, -16.5), (25.5, -17))
        make_face()
    extrude(amount=-CUT_EXTRUDE34_DEPTH, mode=Mode.SUBTRACT)

    # Sketch48 → Cut-Extrude35 (cut, through all)
    with BuildSketch(Plane(origin=(23, 0, 0), x_dir=(0, 0, -1), z_dir=(1, 0, 0))):
        with Locations((9.75, -41.25)):
            Rectangle(SKETCH48_W, SKETCH48_H)
    extrude(amount=-CUT_EXTRUDE35_DEPTH, mode=Mode.SUBTRACT)


solid = part.part
